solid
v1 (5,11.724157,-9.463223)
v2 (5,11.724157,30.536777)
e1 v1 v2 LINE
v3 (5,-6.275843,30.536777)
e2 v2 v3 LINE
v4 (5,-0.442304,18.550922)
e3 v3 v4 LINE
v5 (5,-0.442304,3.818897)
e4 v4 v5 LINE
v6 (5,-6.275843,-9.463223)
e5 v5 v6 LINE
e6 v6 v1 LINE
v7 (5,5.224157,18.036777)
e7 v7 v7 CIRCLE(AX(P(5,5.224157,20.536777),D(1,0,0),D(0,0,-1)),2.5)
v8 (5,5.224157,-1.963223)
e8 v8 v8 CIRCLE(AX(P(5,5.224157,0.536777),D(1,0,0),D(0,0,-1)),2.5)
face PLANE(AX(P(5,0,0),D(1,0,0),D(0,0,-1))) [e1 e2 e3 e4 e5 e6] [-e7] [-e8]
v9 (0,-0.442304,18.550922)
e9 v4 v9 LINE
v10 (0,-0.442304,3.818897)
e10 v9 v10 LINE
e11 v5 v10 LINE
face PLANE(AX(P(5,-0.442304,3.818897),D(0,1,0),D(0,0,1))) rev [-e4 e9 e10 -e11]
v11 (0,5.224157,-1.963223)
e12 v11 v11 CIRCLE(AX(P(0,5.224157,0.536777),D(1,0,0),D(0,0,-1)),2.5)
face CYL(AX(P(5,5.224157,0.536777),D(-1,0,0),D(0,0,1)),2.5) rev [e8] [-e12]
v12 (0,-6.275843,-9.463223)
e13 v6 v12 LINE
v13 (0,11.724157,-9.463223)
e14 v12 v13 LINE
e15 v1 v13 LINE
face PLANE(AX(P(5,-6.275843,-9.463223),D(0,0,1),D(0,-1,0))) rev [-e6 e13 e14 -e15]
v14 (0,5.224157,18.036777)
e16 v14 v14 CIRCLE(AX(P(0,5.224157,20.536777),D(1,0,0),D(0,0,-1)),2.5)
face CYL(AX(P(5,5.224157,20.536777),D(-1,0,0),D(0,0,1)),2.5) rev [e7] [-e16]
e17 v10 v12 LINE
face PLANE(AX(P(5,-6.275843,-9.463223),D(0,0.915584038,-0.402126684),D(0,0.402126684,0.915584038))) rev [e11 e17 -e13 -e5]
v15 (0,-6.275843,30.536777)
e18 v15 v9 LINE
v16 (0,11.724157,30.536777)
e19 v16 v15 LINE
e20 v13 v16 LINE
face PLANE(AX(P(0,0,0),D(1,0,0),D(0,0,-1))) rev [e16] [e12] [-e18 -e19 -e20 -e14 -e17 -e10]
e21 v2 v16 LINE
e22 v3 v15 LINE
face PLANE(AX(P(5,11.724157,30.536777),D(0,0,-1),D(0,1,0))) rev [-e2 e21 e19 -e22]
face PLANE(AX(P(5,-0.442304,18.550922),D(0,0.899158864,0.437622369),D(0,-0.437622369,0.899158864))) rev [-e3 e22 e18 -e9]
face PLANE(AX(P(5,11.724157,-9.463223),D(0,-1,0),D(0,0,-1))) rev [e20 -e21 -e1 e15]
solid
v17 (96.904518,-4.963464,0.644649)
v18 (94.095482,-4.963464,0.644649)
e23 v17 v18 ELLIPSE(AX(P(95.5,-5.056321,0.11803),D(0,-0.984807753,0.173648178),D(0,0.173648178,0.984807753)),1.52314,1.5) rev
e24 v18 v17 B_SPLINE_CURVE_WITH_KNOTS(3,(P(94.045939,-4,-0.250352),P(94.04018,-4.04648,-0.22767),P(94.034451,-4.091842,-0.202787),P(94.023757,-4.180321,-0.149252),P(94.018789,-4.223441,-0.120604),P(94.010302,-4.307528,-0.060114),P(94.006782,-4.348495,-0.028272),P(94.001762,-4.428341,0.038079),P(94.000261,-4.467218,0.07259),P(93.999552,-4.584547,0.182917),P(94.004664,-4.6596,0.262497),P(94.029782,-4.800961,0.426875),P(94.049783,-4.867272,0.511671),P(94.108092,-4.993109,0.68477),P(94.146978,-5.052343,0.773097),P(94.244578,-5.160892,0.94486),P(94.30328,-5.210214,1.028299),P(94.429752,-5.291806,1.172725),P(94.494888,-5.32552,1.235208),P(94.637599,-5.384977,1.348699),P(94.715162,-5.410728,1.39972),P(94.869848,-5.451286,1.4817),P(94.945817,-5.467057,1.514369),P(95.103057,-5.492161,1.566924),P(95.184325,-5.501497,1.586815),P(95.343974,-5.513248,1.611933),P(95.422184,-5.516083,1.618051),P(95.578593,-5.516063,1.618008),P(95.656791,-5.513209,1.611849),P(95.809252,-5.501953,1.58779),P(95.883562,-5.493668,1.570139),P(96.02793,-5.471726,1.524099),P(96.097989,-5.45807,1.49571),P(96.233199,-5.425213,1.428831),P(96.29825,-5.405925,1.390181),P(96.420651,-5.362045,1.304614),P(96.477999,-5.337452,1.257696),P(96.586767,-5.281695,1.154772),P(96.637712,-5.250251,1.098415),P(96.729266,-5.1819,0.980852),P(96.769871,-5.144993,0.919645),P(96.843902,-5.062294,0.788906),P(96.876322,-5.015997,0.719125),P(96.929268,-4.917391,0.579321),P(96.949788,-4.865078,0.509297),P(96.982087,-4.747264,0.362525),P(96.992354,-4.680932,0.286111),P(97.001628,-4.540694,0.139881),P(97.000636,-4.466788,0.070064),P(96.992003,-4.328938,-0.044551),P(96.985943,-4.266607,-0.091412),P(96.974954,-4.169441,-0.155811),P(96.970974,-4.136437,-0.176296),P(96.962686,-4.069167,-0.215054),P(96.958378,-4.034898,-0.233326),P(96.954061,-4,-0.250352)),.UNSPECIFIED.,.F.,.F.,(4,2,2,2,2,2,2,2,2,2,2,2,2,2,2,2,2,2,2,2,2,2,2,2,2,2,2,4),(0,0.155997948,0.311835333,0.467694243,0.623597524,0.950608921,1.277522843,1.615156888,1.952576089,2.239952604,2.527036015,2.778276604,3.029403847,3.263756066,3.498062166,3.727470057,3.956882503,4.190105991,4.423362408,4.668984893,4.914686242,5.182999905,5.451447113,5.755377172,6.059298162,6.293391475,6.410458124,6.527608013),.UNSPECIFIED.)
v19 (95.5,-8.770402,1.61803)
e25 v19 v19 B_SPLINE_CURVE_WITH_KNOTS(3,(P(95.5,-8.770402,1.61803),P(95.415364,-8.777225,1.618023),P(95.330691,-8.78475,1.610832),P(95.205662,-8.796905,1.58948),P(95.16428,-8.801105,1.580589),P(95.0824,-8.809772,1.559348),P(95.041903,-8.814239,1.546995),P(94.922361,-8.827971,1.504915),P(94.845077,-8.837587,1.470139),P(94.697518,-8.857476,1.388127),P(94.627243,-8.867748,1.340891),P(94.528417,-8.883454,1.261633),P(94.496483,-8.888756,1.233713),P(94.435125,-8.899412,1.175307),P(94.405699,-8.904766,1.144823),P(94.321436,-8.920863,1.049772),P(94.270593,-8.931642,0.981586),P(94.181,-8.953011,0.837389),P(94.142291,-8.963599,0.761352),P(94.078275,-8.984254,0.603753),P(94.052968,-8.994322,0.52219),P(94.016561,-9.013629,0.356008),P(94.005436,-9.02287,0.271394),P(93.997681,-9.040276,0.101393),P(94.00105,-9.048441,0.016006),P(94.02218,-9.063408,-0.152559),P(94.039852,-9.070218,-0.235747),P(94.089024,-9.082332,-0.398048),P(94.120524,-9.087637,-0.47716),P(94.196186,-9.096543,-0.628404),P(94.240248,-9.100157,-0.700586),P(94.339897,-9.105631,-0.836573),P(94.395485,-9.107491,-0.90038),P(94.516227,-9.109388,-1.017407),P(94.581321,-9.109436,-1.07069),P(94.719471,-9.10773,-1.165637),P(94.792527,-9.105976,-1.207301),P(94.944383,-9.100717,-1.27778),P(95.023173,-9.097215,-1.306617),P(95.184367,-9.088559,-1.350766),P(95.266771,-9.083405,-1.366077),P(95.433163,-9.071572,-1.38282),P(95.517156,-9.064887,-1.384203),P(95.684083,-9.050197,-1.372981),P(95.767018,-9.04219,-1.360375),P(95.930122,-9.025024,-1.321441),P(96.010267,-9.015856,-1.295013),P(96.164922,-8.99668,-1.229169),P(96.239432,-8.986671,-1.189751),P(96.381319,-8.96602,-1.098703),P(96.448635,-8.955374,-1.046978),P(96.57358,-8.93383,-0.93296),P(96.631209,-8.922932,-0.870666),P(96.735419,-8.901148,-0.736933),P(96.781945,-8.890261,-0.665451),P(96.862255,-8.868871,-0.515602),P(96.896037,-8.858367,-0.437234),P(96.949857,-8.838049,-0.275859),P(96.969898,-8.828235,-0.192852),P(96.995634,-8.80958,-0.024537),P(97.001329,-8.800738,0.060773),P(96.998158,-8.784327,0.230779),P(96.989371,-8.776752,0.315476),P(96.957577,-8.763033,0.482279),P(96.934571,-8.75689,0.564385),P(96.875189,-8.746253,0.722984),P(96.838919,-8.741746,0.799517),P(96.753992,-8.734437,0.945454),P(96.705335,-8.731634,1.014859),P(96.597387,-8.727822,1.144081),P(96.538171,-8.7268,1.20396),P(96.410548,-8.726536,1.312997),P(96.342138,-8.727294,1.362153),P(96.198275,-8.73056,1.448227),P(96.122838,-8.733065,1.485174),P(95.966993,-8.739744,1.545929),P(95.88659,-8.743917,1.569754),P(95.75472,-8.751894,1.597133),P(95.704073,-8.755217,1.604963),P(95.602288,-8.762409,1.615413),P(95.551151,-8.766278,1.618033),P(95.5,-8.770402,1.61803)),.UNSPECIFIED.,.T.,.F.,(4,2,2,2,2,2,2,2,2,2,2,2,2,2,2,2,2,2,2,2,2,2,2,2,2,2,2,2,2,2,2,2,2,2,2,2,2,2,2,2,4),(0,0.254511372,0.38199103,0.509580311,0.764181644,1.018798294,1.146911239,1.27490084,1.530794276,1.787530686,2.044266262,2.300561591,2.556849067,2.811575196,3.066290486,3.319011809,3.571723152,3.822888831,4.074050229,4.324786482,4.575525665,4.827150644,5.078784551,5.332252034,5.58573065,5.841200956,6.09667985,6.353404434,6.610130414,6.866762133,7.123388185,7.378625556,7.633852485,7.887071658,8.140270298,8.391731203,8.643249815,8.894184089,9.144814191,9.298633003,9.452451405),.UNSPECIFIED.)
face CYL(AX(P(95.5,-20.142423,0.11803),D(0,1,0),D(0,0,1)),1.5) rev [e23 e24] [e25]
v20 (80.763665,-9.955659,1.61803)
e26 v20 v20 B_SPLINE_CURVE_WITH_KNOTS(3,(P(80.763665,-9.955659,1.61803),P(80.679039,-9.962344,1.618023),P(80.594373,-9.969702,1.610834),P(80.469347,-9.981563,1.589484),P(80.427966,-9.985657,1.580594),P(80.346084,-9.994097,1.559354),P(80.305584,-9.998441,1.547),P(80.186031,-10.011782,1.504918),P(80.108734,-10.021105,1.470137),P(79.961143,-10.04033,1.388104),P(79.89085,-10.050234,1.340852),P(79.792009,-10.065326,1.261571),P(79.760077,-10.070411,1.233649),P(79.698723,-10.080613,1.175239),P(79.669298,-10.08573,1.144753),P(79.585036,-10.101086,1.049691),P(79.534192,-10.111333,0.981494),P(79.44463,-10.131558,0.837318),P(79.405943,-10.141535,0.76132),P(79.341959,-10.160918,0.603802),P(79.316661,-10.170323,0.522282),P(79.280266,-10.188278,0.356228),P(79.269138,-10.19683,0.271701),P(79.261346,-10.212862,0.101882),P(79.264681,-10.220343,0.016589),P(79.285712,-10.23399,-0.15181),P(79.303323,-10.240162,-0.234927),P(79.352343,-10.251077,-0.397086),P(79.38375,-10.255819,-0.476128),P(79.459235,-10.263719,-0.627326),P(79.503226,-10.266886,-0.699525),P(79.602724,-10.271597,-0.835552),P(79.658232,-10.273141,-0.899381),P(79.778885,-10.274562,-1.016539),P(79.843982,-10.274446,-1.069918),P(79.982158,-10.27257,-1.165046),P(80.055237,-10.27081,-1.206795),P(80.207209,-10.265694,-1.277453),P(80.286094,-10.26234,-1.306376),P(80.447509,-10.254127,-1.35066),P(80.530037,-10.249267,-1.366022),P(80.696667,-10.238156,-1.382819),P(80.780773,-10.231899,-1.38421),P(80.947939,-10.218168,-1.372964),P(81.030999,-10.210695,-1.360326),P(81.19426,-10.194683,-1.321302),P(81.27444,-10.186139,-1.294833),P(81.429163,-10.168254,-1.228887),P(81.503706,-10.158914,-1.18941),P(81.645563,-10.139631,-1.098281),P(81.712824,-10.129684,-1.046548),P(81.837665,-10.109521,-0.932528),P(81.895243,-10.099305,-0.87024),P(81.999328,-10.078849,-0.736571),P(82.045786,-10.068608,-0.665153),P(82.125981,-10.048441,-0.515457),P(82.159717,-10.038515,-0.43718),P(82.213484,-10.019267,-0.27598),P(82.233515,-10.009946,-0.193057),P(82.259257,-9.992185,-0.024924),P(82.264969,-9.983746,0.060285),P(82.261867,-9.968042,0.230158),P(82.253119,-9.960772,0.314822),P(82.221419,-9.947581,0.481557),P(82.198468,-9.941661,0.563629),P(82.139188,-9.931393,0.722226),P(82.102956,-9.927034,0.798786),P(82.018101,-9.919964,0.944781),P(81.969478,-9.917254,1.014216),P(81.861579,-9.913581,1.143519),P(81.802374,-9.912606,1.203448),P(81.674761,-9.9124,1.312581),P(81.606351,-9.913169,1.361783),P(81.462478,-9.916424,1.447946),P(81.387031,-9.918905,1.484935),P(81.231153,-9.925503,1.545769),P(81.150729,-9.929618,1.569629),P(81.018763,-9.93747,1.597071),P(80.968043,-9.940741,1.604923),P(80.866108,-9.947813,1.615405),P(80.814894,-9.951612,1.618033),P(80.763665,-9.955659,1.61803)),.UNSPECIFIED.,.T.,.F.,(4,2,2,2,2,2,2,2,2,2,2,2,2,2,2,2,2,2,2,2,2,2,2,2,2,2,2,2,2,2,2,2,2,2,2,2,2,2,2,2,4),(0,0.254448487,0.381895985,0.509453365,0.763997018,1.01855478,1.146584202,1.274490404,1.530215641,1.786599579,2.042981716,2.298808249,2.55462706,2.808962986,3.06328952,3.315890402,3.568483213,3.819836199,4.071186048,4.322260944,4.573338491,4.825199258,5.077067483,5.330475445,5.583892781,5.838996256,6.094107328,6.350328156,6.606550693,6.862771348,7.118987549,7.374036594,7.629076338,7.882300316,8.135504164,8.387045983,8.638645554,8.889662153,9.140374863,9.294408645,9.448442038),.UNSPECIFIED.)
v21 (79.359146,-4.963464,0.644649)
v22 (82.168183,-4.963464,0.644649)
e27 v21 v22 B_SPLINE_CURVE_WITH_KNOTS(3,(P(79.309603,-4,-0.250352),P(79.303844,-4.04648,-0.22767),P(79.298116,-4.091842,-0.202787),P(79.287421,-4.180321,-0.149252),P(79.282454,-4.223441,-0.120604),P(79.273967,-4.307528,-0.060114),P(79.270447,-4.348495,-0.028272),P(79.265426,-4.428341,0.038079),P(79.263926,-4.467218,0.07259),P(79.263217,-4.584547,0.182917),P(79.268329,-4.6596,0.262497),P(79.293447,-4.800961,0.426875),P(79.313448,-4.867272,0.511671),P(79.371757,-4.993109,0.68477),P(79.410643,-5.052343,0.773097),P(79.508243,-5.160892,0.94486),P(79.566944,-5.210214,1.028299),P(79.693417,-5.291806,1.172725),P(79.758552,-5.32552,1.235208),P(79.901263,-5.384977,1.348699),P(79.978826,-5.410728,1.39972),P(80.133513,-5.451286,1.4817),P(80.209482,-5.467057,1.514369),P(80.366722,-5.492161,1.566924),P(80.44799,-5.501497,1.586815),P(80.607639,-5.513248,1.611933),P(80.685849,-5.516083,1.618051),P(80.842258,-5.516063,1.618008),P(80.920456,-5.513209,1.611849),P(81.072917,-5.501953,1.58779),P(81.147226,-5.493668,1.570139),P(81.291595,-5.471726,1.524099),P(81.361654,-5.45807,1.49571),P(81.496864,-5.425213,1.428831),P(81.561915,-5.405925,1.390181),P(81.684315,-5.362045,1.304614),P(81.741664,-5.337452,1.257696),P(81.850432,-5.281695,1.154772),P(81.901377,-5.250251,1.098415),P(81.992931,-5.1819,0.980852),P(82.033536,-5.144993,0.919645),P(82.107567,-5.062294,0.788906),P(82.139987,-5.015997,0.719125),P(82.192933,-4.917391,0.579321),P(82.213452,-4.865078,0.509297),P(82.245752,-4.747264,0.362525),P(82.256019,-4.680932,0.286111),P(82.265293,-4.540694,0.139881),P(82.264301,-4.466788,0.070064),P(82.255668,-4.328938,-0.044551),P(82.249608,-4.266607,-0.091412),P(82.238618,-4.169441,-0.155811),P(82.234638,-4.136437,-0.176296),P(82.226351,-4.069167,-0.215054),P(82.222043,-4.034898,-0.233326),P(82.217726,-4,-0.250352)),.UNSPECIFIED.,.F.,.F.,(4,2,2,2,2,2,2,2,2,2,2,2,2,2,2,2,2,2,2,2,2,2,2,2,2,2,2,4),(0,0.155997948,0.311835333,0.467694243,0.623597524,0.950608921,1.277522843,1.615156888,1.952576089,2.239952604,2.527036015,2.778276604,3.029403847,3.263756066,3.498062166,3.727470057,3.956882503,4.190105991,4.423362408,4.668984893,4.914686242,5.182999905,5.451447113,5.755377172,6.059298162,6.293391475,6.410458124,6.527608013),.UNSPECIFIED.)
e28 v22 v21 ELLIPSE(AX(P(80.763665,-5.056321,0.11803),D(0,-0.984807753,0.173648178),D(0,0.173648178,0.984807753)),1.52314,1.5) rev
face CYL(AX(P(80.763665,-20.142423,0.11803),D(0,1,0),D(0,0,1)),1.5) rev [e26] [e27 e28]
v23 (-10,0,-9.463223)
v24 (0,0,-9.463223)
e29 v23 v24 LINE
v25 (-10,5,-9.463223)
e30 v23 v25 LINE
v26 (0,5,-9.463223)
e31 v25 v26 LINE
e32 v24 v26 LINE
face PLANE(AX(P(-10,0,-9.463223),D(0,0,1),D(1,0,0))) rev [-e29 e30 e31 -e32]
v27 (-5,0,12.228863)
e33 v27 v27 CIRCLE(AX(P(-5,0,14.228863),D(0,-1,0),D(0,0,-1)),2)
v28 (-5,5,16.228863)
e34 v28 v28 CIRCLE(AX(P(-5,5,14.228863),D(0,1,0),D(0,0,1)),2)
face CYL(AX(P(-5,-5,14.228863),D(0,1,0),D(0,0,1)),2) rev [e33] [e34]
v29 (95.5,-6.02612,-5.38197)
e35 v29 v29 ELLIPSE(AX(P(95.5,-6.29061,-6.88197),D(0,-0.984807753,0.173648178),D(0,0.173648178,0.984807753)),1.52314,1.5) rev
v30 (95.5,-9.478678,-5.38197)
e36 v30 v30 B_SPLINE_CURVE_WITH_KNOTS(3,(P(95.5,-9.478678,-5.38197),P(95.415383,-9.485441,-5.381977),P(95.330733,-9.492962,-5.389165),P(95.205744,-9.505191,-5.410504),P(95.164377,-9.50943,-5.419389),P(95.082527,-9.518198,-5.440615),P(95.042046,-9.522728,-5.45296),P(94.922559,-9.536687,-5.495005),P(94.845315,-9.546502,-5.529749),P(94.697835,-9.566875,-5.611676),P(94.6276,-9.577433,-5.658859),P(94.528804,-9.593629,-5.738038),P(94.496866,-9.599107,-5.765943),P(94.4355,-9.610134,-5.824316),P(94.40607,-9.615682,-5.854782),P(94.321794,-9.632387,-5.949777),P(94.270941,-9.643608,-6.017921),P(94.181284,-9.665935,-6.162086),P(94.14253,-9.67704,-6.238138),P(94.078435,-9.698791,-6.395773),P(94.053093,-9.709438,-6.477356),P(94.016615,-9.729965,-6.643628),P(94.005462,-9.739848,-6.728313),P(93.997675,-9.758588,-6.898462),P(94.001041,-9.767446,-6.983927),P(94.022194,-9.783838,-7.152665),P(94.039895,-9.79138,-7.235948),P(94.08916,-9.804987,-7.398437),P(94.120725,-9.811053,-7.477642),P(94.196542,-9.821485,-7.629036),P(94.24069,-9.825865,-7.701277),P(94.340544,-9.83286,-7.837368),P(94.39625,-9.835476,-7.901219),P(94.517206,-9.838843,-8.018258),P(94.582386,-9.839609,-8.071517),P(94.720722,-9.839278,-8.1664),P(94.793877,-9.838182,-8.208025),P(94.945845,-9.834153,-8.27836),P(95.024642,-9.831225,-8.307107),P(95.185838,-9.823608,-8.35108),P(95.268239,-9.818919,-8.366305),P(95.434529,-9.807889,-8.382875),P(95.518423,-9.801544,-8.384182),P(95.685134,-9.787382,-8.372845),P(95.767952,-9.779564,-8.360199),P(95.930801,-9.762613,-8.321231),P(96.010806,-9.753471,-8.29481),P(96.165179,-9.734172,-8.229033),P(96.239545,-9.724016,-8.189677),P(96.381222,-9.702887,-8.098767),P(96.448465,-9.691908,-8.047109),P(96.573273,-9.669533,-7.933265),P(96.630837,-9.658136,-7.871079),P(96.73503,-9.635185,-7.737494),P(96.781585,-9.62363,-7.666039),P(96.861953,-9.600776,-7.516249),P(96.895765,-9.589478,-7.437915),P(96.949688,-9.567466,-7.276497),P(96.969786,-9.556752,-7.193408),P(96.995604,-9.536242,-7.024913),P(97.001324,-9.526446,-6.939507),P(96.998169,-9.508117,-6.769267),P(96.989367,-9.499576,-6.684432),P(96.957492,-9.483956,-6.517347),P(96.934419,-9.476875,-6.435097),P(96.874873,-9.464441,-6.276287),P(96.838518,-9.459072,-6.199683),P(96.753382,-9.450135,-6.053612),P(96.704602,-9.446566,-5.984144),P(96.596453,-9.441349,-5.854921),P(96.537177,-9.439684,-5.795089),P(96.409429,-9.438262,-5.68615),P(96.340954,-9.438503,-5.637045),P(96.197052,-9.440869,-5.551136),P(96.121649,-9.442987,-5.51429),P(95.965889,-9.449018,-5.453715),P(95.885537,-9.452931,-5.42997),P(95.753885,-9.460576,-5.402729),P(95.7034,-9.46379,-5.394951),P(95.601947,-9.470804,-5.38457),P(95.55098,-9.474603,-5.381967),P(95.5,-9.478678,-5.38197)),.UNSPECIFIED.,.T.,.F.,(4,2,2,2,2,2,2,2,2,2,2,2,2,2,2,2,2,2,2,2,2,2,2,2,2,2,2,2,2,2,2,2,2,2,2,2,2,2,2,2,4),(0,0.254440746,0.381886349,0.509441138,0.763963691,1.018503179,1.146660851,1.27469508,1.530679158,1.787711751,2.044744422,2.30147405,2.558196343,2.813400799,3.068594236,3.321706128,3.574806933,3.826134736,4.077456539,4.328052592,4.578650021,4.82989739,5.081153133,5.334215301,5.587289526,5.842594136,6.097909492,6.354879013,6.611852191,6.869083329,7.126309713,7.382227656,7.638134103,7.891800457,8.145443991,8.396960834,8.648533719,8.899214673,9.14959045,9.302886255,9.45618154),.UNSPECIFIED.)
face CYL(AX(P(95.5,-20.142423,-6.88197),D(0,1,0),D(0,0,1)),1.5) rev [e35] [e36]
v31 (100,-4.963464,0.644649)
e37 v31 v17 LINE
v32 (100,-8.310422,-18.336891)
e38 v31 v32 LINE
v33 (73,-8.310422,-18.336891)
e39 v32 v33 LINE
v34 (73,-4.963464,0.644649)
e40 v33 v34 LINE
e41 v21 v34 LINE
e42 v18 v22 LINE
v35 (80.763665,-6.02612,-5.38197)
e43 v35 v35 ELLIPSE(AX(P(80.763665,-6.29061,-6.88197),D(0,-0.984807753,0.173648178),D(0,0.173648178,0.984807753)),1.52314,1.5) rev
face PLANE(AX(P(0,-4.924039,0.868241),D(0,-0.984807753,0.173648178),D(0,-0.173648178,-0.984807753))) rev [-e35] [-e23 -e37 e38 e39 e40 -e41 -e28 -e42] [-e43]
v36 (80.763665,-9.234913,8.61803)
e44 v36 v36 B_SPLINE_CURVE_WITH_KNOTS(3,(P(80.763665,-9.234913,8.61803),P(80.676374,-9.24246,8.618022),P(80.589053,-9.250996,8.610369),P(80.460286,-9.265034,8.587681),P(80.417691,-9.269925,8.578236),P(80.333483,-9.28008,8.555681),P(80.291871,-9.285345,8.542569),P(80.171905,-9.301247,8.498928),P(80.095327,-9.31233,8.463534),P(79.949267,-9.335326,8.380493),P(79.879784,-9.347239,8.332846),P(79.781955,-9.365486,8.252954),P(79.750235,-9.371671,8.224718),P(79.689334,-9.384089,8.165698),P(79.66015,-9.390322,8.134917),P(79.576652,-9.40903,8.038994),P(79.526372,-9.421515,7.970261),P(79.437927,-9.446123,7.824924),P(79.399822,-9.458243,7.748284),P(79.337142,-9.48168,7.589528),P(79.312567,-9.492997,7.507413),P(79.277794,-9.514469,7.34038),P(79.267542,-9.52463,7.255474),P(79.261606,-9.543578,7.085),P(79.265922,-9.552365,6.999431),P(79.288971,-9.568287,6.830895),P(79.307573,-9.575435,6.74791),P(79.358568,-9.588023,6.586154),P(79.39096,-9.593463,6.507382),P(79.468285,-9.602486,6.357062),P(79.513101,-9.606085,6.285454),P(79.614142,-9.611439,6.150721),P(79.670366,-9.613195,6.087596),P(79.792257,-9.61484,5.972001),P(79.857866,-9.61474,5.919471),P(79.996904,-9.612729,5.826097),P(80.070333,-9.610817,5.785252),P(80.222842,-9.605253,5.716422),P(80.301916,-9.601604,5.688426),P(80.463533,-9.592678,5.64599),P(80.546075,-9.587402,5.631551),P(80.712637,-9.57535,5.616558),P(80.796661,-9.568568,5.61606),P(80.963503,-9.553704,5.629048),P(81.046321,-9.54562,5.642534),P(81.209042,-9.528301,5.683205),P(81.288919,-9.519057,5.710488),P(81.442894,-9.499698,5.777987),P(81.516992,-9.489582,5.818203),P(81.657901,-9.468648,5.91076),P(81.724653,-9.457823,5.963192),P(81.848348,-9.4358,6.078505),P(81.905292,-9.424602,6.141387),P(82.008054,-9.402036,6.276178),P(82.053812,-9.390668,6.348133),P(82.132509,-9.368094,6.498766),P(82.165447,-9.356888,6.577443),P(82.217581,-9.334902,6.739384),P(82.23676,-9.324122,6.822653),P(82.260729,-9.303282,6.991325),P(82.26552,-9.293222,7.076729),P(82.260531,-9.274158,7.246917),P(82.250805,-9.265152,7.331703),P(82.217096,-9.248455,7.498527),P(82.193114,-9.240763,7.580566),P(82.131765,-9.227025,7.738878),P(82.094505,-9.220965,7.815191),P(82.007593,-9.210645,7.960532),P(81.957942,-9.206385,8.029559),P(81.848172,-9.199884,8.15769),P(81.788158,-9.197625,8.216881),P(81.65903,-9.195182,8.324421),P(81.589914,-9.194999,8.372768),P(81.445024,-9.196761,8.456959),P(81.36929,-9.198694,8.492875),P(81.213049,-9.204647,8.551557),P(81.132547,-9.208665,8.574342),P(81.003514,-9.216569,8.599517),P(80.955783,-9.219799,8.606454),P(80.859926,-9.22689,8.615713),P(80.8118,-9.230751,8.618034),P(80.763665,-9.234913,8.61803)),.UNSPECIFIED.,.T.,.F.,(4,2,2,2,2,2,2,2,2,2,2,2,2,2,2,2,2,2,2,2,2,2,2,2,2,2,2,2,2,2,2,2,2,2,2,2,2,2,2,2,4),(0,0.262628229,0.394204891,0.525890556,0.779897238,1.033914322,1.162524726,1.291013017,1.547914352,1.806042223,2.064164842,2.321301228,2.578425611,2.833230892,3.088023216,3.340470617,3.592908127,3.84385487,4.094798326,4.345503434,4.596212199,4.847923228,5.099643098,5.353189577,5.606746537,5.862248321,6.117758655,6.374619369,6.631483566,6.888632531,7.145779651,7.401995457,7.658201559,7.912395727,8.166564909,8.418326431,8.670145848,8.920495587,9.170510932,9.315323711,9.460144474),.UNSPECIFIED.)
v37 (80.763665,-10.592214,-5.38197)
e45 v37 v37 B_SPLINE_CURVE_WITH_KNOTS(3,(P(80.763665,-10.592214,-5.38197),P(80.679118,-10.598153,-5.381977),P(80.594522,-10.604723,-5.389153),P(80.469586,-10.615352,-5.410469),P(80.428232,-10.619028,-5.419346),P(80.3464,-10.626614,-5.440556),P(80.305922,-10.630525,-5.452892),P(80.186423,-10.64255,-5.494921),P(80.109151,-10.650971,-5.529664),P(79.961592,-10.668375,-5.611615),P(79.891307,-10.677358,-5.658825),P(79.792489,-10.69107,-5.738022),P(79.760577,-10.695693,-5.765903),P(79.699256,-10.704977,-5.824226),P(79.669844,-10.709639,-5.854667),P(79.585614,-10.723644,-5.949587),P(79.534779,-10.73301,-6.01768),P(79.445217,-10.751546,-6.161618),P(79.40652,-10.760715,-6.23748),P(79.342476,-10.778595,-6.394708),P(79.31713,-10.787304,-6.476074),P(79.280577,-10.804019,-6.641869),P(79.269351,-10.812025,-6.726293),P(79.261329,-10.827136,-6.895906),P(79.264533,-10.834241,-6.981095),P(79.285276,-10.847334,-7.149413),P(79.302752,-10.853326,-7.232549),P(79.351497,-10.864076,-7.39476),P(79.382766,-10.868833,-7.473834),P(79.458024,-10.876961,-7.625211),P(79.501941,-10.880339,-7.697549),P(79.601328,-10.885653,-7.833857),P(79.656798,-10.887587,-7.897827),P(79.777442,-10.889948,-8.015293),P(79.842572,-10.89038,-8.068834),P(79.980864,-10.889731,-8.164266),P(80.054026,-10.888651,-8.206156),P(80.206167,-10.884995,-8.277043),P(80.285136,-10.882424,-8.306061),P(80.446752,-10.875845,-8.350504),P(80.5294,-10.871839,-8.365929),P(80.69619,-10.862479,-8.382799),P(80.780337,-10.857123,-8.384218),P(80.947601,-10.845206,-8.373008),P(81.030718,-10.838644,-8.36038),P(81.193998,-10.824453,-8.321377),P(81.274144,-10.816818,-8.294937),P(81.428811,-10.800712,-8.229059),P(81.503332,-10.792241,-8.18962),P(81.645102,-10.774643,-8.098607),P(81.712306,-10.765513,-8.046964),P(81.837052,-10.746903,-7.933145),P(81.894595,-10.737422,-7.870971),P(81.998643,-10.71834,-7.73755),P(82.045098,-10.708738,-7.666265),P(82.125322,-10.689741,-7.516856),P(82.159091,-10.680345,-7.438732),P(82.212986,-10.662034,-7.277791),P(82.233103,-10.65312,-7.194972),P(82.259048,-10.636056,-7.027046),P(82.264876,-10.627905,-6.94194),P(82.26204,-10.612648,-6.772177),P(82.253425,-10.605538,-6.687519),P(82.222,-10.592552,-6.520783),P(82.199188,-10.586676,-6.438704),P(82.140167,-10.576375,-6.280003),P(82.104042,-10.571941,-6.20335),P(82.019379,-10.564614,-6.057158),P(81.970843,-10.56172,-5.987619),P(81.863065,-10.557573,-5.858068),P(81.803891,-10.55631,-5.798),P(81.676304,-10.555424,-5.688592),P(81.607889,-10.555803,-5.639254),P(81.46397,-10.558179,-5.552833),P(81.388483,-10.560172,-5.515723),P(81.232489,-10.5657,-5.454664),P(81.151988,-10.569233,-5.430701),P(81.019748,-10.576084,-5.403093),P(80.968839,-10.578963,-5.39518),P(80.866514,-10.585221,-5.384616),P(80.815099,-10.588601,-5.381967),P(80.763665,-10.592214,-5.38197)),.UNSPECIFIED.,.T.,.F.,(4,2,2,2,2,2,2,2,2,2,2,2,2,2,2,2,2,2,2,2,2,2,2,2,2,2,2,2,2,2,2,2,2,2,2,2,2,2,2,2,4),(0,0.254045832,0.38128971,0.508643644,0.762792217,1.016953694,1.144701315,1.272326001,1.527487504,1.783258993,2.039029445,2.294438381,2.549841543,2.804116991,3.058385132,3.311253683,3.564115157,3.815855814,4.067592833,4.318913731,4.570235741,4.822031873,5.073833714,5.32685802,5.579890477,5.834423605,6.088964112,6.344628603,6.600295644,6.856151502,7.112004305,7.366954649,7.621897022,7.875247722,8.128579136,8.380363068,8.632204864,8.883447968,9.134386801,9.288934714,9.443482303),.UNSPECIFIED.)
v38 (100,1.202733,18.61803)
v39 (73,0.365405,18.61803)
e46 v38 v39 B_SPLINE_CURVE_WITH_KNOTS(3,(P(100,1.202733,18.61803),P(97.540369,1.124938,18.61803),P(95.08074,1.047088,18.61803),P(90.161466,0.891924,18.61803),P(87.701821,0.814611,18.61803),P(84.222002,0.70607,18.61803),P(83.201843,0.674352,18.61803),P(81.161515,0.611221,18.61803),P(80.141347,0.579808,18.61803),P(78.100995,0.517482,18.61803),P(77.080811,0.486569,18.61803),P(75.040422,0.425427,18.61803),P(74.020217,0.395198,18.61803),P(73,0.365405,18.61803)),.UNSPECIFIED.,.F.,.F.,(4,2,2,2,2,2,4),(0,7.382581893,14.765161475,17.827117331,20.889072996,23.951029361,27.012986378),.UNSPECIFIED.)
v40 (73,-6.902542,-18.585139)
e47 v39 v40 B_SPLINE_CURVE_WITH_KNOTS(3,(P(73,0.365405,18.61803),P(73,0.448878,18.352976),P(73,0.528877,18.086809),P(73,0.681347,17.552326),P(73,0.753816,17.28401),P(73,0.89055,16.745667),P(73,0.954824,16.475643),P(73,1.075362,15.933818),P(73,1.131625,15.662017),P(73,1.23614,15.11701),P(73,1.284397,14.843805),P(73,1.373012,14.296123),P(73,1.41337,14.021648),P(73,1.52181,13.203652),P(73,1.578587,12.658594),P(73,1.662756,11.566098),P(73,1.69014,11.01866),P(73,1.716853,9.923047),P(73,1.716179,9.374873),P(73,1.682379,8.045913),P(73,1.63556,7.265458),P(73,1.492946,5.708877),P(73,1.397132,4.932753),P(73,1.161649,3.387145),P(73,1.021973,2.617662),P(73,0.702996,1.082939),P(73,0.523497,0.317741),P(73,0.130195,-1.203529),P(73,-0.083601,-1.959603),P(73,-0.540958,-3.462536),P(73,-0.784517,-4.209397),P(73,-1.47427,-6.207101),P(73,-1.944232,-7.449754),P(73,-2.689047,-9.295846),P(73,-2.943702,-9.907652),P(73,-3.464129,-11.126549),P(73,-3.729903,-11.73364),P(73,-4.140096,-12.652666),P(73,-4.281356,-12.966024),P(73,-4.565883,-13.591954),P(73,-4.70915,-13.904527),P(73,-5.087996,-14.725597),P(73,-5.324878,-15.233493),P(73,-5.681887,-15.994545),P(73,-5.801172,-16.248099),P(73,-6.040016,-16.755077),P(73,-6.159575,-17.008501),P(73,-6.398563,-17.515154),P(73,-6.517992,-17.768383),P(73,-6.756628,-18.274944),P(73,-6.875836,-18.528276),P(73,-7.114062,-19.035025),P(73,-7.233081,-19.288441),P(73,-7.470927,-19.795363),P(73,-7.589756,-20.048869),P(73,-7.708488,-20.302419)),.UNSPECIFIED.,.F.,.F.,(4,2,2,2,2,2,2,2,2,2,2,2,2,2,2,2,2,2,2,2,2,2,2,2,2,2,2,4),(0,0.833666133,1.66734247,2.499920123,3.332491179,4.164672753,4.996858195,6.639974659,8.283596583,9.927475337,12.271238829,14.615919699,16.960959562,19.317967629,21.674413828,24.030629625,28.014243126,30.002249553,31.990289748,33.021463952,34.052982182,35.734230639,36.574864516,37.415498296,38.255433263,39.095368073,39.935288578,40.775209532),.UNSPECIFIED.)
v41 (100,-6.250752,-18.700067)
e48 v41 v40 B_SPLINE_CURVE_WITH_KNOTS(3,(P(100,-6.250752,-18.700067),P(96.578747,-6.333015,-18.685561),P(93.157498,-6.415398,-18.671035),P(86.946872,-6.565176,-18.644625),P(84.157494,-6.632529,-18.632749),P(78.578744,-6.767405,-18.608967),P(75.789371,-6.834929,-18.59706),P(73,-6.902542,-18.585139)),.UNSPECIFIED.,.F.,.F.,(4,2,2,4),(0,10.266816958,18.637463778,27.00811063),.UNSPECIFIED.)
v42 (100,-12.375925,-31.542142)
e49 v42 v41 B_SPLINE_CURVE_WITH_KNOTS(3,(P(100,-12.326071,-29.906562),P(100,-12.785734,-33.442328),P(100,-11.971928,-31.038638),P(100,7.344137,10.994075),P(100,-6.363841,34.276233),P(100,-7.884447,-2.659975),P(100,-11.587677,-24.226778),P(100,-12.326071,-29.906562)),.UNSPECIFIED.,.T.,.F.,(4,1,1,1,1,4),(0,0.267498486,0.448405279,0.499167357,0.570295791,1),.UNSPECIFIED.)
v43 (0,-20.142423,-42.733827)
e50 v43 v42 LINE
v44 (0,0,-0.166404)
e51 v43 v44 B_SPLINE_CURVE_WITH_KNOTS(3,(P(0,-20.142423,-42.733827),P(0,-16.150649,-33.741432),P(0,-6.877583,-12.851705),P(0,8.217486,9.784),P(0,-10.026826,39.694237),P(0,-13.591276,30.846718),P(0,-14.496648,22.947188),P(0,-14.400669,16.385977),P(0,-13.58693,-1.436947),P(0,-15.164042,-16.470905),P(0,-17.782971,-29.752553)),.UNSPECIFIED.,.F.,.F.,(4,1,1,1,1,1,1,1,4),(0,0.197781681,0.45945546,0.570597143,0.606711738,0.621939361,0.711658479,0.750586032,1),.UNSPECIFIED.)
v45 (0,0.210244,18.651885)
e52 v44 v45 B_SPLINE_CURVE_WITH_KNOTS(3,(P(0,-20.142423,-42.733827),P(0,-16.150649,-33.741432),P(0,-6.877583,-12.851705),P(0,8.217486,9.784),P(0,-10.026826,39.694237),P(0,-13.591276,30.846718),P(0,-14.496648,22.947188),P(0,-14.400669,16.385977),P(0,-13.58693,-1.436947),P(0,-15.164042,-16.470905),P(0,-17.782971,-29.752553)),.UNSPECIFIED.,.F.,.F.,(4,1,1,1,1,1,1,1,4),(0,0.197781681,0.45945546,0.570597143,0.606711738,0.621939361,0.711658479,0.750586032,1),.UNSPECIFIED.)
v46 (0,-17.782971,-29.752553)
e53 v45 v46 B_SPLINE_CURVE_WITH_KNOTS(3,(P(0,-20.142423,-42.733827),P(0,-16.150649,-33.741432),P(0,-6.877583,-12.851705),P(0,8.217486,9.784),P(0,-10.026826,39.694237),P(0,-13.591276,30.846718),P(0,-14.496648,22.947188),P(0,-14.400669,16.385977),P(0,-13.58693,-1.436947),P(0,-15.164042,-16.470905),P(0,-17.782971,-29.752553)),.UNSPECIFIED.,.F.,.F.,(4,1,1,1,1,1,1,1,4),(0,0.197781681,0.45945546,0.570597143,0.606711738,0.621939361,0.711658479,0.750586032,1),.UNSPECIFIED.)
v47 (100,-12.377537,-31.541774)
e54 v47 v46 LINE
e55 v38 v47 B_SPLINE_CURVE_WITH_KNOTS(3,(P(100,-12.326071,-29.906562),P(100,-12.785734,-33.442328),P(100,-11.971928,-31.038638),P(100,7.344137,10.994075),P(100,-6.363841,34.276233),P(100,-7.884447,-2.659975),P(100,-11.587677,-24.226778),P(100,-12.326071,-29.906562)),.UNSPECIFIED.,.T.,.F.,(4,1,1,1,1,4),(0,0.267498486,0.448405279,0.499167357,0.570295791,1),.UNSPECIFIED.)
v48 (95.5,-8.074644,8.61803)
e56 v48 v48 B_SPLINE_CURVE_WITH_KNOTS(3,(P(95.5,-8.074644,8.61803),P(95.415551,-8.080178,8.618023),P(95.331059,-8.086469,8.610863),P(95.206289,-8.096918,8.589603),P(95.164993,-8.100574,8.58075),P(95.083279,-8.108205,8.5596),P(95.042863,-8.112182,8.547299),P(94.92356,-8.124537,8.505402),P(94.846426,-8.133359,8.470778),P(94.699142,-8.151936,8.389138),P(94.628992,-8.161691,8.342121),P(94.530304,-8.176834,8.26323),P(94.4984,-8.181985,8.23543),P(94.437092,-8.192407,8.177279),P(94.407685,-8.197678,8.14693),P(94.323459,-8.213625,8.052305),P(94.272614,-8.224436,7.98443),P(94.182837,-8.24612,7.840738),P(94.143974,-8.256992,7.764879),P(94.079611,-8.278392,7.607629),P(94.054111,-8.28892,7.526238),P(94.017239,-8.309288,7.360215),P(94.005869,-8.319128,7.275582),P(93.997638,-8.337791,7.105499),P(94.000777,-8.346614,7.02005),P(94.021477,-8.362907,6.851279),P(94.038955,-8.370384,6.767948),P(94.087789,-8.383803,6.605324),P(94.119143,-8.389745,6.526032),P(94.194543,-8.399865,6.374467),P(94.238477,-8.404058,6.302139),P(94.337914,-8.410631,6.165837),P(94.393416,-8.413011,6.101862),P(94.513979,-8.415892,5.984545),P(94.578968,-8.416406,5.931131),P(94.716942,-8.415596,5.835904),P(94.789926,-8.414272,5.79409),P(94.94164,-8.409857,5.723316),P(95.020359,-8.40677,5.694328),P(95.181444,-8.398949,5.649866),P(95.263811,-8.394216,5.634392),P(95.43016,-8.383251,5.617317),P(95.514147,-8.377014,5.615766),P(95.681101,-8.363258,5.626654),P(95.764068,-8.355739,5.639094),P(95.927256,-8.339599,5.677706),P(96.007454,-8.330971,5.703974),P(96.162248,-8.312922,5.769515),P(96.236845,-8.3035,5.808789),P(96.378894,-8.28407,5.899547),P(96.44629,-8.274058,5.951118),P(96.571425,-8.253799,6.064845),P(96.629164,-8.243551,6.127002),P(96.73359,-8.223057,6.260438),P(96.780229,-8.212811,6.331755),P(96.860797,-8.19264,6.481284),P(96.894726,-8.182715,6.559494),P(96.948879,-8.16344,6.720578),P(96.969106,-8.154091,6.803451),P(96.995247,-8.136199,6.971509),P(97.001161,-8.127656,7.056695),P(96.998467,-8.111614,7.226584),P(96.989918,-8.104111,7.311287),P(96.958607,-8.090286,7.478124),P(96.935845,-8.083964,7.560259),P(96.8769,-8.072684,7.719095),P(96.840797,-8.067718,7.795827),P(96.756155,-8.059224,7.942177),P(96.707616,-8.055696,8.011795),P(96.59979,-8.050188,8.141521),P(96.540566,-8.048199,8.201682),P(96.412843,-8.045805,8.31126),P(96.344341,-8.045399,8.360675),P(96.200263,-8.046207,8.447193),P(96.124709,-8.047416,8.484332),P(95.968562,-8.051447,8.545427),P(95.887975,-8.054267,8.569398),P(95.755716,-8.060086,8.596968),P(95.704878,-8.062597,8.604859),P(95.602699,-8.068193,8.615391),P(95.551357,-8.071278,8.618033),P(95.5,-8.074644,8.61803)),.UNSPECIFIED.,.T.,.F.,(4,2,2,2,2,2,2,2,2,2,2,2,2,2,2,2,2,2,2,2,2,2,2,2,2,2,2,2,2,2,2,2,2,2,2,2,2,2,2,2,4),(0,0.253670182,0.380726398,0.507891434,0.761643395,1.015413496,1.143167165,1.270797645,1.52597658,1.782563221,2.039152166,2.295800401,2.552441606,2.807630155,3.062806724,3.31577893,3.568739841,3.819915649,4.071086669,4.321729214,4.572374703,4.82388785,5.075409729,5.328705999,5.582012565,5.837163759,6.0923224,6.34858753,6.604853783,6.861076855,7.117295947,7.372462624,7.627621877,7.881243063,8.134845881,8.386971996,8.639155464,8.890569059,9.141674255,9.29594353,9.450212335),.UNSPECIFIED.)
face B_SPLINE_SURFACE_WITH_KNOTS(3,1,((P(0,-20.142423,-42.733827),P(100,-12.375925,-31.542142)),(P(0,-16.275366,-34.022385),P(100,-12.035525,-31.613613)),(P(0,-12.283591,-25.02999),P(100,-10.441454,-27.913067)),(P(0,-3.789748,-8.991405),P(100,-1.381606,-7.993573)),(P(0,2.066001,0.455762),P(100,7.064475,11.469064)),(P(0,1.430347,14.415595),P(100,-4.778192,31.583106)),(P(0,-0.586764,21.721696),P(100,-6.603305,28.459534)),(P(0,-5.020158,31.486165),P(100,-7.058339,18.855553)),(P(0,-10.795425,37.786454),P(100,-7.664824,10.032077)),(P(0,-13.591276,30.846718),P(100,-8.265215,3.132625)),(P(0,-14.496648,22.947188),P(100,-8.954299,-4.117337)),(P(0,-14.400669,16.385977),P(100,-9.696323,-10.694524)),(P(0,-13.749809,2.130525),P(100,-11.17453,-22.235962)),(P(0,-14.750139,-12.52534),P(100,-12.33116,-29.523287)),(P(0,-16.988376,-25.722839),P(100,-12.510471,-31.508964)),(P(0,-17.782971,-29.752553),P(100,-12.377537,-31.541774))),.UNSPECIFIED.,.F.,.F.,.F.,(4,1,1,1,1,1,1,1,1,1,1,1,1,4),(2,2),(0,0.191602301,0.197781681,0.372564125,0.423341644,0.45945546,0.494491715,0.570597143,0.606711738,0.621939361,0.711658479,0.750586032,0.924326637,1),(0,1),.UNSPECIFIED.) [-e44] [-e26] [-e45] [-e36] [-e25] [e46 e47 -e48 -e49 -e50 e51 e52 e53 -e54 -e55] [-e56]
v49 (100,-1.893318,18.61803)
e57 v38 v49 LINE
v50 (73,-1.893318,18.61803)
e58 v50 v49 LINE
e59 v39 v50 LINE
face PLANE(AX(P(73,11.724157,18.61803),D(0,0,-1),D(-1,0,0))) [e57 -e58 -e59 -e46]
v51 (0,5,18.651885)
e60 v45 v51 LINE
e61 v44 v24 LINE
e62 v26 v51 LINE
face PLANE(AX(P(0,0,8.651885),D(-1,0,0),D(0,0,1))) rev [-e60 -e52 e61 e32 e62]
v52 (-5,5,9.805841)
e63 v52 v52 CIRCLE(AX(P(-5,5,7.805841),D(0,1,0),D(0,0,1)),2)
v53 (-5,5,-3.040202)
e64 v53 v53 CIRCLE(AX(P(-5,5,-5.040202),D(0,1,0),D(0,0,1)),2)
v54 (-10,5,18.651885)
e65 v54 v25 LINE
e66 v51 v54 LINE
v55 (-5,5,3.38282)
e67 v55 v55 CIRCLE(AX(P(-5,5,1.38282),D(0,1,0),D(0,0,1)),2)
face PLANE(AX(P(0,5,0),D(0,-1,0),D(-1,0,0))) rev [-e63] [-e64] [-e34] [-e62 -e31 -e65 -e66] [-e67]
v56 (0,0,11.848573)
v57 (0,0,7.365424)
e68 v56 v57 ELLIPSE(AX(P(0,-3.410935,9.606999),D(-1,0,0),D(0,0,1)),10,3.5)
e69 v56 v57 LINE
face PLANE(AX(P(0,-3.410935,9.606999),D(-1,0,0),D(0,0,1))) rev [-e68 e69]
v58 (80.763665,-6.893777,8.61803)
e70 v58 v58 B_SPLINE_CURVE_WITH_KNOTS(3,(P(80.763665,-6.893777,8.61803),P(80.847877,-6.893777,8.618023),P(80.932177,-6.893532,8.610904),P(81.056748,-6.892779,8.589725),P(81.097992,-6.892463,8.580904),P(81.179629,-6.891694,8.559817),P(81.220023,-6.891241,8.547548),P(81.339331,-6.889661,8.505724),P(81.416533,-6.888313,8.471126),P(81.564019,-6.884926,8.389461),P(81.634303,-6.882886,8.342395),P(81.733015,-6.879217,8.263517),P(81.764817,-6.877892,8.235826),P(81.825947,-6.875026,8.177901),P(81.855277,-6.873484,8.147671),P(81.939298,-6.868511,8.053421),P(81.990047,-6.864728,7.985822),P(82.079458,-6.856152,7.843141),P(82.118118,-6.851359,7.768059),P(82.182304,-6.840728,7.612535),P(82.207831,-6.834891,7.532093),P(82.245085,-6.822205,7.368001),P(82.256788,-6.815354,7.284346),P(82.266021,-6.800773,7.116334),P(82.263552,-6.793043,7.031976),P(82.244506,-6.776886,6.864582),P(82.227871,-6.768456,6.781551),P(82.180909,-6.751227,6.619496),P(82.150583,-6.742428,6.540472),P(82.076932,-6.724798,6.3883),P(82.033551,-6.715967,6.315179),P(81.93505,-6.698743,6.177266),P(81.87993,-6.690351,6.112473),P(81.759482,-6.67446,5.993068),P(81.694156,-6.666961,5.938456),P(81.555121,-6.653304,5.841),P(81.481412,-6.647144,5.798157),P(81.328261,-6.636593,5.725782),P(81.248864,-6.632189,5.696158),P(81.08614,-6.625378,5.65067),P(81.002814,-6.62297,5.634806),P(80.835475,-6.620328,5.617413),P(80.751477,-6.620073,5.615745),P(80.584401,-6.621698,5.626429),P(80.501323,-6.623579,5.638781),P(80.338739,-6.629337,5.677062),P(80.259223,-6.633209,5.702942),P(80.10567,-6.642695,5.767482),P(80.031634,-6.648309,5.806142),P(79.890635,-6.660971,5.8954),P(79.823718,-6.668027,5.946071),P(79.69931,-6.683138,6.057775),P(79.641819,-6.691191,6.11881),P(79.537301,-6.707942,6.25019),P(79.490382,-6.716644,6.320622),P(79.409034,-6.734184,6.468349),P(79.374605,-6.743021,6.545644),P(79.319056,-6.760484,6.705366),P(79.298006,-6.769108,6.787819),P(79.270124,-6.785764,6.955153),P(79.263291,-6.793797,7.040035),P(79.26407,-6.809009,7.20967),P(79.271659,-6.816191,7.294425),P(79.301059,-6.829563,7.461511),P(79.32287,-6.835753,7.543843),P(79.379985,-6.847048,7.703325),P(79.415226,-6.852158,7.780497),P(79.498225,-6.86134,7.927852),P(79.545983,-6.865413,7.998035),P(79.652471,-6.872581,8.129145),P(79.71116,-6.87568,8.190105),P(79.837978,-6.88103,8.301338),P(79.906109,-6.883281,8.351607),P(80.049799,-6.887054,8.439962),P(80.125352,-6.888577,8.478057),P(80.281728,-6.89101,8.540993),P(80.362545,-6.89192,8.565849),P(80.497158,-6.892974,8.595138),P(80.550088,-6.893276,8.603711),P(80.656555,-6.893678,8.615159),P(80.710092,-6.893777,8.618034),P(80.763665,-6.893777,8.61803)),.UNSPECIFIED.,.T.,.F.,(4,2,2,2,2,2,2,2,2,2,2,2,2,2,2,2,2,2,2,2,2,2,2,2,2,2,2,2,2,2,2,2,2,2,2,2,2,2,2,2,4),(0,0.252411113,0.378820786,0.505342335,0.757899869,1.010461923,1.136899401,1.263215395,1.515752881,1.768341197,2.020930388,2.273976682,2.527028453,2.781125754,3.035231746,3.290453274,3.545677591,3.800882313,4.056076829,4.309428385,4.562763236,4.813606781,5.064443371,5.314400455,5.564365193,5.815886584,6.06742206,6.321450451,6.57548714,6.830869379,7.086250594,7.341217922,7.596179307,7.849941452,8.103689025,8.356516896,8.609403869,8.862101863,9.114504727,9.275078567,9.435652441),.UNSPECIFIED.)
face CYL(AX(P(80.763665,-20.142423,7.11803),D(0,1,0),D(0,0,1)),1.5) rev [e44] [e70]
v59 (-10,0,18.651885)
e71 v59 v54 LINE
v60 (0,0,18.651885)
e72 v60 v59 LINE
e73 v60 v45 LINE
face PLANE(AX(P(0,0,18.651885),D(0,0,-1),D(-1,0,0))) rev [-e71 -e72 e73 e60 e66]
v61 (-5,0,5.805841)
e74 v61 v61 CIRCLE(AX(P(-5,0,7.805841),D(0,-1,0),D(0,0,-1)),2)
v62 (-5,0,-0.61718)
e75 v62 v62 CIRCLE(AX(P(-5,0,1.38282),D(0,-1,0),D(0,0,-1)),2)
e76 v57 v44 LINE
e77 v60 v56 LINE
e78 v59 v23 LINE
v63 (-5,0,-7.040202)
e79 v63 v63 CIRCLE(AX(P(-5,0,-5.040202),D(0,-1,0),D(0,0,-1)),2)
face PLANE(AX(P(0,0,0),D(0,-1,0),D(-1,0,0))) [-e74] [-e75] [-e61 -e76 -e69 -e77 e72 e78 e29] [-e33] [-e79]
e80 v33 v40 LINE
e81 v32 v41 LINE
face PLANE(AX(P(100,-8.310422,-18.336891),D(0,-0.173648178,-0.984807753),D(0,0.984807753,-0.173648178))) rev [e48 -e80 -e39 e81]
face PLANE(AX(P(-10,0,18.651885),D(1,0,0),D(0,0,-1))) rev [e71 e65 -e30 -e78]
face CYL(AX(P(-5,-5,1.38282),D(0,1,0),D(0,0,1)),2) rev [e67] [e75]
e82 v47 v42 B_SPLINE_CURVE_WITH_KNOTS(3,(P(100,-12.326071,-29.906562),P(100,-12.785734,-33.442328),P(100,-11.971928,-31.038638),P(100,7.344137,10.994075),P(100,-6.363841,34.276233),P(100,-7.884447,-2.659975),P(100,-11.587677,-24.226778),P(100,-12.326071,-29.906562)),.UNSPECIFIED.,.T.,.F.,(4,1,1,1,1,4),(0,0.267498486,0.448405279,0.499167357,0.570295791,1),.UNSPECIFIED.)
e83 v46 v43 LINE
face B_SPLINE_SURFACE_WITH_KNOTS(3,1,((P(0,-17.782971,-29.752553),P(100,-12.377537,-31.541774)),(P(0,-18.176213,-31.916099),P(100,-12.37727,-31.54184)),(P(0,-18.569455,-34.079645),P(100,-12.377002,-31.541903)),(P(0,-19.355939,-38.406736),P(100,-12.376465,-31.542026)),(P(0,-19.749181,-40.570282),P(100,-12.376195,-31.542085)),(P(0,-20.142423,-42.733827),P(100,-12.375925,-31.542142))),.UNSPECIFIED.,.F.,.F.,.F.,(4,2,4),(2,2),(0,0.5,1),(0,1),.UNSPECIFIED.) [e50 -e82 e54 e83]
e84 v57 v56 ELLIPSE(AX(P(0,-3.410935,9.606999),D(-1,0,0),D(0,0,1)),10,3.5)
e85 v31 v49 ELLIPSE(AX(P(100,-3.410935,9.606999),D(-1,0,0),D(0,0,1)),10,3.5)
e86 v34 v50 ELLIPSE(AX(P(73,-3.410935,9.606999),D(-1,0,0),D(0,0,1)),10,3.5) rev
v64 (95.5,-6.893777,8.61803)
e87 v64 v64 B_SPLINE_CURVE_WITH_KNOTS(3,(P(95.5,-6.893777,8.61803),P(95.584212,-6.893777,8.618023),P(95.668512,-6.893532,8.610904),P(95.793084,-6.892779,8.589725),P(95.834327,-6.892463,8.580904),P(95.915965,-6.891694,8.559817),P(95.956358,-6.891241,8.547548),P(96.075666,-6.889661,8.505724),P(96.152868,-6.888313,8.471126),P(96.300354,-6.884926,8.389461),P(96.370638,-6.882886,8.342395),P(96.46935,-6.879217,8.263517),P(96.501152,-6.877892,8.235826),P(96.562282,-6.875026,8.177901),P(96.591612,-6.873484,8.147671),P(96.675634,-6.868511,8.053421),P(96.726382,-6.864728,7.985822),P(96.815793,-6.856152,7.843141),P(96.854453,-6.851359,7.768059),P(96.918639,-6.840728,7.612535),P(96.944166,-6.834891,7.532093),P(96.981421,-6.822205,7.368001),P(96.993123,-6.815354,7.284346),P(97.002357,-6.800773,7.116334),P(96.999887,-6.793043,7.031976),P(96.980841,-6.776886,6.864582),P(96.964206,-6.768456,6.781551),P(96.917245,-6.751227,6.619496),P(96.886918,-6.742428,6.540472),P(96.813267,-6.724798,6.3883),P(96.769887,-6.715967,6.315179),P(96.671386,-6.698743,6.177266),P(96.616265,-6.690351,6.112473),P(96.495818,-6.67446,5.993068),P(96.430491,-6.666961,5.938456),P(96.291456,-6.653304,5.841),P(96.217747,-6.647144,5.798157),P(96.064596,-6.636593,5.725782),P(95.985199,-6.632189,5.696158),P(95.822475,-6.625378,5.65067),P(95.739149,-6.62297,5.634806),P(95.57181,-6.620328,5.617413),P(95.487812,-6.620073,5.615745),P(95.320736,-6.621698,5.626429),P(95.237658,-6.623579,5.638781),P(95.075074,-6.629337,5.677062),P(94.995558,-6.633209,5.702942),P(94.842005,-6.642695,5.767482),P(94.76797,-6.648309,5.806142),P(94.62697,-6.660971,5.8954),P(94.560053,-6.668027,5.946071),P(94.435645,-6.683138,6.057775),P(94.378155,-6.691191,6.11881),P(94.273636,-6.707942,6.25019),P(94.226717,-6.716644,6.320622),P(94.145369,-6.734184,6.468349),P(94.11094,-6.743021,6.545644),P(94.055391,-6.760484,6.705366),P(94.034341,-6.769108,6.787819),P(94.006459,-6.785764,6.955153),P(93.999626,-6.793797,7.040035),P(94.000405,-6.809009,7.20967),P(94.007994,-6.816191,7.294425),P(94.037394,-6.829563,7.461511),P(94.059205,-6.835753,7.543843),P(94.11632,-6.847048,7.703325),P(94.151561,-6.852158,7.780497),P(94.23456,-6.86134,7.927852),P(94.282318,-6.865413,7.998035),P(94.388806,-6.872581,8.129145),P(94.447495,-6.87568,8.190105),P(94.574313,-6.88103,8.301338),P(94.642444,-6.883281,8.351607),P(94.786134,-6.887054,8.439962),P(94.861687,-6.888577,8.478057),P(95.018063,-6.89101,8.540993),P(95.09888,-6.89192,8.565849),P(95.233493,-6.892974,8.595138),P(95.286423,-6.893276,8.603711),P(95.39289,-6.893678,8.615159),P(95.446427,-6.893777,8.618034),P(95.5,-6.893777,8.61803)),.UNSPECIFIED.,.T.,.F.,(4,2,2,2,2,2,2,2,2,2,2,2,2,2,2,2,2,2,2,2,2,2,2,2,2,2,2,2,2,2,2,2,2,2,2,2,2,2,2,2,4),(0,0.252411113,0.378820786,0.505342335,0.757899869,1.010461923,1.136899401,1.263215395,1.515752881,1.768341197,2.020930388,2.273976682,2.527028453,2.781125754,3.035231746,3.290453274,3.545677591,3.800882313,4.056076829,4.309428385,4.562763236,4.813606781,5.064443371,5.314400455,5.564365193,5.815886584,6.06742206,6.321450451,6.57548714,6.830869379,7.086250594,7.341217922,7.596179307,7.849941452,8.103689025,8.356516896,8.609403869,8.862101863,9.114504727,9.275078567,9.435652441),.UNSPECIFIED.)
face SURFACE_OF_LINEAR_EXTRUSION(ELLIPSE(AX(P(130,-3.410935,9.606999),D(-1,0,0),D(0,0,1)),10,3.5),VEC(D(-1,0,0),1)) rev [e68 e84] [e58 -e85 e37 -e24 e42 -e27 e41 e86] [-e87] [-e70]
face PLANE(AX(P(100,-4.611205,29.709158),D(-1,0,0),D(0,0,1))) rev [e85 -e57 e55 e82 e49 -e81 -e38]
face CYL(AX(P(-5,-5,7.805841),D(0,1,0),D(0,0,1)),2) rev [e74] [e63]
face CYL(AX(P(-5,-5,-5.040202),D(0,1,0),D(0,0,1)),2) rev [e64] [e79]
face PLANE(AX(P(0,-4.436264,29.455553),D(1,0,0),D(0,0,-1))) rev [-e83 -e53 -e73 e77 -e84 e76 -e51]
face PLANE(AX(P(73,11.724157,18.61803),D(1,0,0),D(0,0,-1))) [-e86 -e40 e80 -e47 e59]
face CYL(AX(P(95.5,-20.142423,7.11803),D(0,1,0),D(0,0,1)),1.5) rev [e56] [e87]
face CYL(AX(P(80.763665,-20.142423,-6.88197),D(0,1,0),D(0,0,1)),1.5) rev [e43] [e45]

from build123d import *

# Parameters (mm, degrees)
SKIZZE5_R                            = 2.5
AUFSATZ_LINEAR_AUSTRAGEN1_DEPTH      = 5
LINEAR_AUSTRAGEN_D_NN1_START         = -5
LINEAR_AUSTRAGEN_D_NN1_OUTLINE_W     = 10
LINEAR_AUSTRAGEN_D_NN1_OUTLINE_H     = 28.115108073
LINEAR_AUSTRAGEN_D_NN1_DEPTH         = 5
SKIZZE11_R                           = 2
SCHNITT_LINEAR_AUSTRAGEN2_DEPTH      = 10
SCHNITT_LINEAR_AUSTRAGEN3_DEPTH      = 112.616851293
SCHNITT_LINEAR_AUSTRAGEN3_DEPTH_BACK = 9
SKIZZE13_W                           = 27
SKIZZE13_H                           = 37
SCHNITT_LINEAR_AUSTRAGEN7_DEPTH      = 110.939792027
SCHNITT_LINEAR_AUSTRAGEN7_DEPTH_BACK = 110.939792027
SKIZZE17_R                           = 1.5
SKIZZE18_RX                          = 10
SKIZZE18_RY                          = 3.5
SCHNITT_LINEAR_AUSTRAGEN8_DEPTH      = 130
SCHNITT_LINEAR_START                 = 10
SKIZZE19_W                           = 27
SKIZZE19_H                           = 37
SCHNITT_LINEAR_AUSTRAGEN9_DEPTH      = 10


with BuildPart() as part:
    # Ausformung2: read off the stored shape, not the designer's step
    # Ausformung2: loft between two sections, ruled curve by curve
    ausformung2_from = [
        Edge.make_bspline([(0, -17.782971384, -29.752553427), (0, -18.176213373, -31.916099097), (0, -18.569455363, -34.079644768), (0, -19.355939343, -38.406736108), (0, -19.749181333, -40.570281779), (0, -20.142423322, -42.733827449)], [0, 0, 0, 0, 0.5, 0.5, 1, 1, 1, 1], 3),
        Edge.make_bspline([(0, -20.142423322, -42.733827449), (0, -16.275365504, -34.022385206), (0, -12.283590924, -25.029989609), (0, -3.789748073, -8.991404596), (0, 2.066001276, 0.455761515), (0, 1.430346702, 14.415595101), (0, -0.586763944, 21.721696295), (0, -5.020157645, 31.4861646), (0, -10.795424952, 37.786454372), (0, -13.591275839, 30.846717822), (0, -14.496647802, 22.947187836), (0, -14.400669009, 16.385976946), (0, -13.749809382, 2.130524692), (0, -14.750138801, -12.525340255), (0, -16.988375852, -25.722839307), (0, -17.782971384, -29.752553427)], [0, 0, 0, 0, 0.191602301, 0.197781681, 0.372564125, 0.423341644, 0.45945546, 0.494491715, 0.570597143, 0.606711738, 0.621939361, 0.711658479, 0.750586032, 0.924326637, 1, 1, 1, 1], 3),
    ]
    ausformung2_to = [
        Edge.make_bspline([(100, -12.377537469, -31.541773649), (100, -12.377270286, -31.541839594), (100, -12.377002346, -31.541903238), (100, -12.37646495, -31.542025921), (100, -12.376195495, -31.542084959), (100, -12.375925281, -31.542141694)], [0, 0, 0, 0, 0.5, 0.5, 1, 1, 1, 1], 3),
        Edge.make_bspline([(100, -12.375925281, -31.542141694), (100, -12.035525318, -31.613612562), (100, -10.441454274, -27.913067425), (100, -1.381605701, -7.993573098), (100, 7.064474888, 11.469064179), (100, -4.778192252, 31.583106174), (100, -6.603305393, 28.459534197), (100, -7.058338771, 18.85555274), (100, -7.66482441, 10.032077024), (100, -8.265214542, 3.132625418), (100, -8.954299419, -4.117336517), (100, -9.69632267, -10.69452384), (100, -11.174529652, -22.235962019), (100, -12.331160065, -29.523287153), (100, -12.51047057, -31.508963631), (100, -12.377537469, -31.541773649)], [0, 0, 0, 0, 0.191602301, 0.197781681, 0.372564125, 0.423341644, 0.45945546, 0.494491715, 0.570597143, 0.606711738, 0.621939361, 0.711658479, 0.750586032, 0.924326637, 1, 1, 1, 1], 3),
    ]
    ausformung2 = Solid(Shell([*[Face.make_surface_from_curves(ausformung2_from[k], ausformung2_to[k]) for k in range(2)], Face(Wire(ausformung2_from)), Face(Wire(ausformung2_to))]))
    add(ausformung2)

    # Linear-Austragen-Dünn1: read off the stored shape, not the designer's step
    # Linear-Austragen-Dünn1 outline → Linear-Austragen-Dünn1 (add)
    with BuildSketch(Plane(origin=(0, 5, 0), x_dir=(1, 0, 0), z_dir=(0, 1, 0)).offset(LINEAR_AUSTRAGEN_D_NN1_START)):
        with Locations((-5, -4.594330562)):
            Rectangle(LINEAR_AUSTRAGEN_D_NN1_OUTLINE_W, LINEAR_AUSTRAGEN_D_NN1_OUTLINE_H)
    extrude(amount=LINEAR_AUSTRAGEN_D_NN1_DEPTH)

    # Skizze11 → Schnitt-Linear austragen2 (cut)
    with BuildSketch(Plane(origin=(0, 5, 0), x_dir=(1, 0, 0), z_dir=(0, 1, 0))):
        with Locations(Location((-5, -14.228862983, 0), (0, 0, 270))):
            Circle(SKIZZE11_R)
        with Locations(Location((-5, 5.040201861, 0), (0, 0, 270))):
            Circle(SKIZZE11_R)
        with Locations(Location((-5, -7.805841369, 0), (0, 0, 270))):
            Circle(SKIZZE11_R)
        with Locations(Location((-5, -1.382819754, 0), (0, 0, 270))):
            Circle(SKIZZE11_R)
    extrude(amount=-SCHNITT_LINEAR_AUSTRAGEN2_DEPTH, mode=Mode.SUBTRACT)

    # Skizze13 → Schnitt-Linear austragen3 (cut, two sides: drawn at the far end of the back side and taken through both)
    with BuildSketch(Plane(origin=(0, 5, 0), x_dir=(1, 0, 0), z_dir=(0, 1, 0)).offset(-SCHNITT_LINEAR_AUSTRAGEN3_DEPTH_BACK)):
        with Locations((86.5, -0.118029586)):
            Rectangle(SKIZZE13_W, SKIZZE13_H)
    extrude(amount=SCHNITT_LINEAR_AUSTRAGEN3_DEPTH + SCHNITT_LINEAR_AUSTRAGEN3_DEPTH_BACK, mode=Mode.SUBTRACT)

    # Skizze17 → Schnitt-Linear austragen7 (cut, two sides: drawn at the far end of the back side and taken through both)
    with BuildSketch(Plane(origin=(0, -4, 0), x_dir=(1, 0, 0), z_dir=(0, 1, 0)).offset(-SCHNITT_LINEAR_AUSTRAGEN7_DEPTH_BACK)):
        with Locations(Location((95.5, -7.118029586, 0), (0, 0, 270))):
            Circle(SKIZZE17_R)
        with Locations(Location((95.5, -0.118029586, 0), (0, 0, 270))):
            Circle(SKIZZE17_R)
        with Locations(Location((95.5, 6.881970414, 0), (0, 0, 270))):
            Circle(SKIZZE17_R)
        with Locations(Location((80.763664796, 6.881970414, 0), (0, 0, 270))):
            Circle(SKIZZE17_R)
        with Locations(Location((80.763664796, -0.118029586, 0), (0, 0, 270))):
            Circle(SKIZZE17_R)
        with Locations(Location((80.763664796, -7.118029586, 0), (0, 0, 270))):
            Circle(SKIZZE17_R)
    extrude(amount=SCHNITT_LINEAR_AUSTRAGEN7_DEPTH + SCHNITT_LINEAR_AUSTRAGEN7_DEPTH_BACK, mode=Mode.SUBTRACT)

    # Skizze18 → Schnitt-Linear austragen8 (cut)
    with BuildSketch(Plane.ZY):
        with Locations((9.606998582, -3.410935315)):
            Ellipse(SKIZZE18_RX, SKIZZE18_RY)
    extrude(amount=-SCHNITT_LINEAR_AUSTRAGEN8_DEPTH, mode=Mode.SUBTRACT)

    # Skizze19 → Schnitt-Linear austragen9 (cut)
    with BuildSketch(Plane(origin=(0, -4.924038765, 0.868240888), x_dir=(1, 0, 0), z_dir=(0, 0.984807753012208, -0.17364817766693072)).offset(SCHNITT_LINEAR_START)):
        with Locations((86.5, 1.001402317)):
            Rectangle(SKIZZE19_W, SKIZZE19_H)
    extrude(amount=-SCHNITT_LINEAR_AUSTRAGEN9_DEPTH, mode=Mode.SUBTRACT)


with BuildPart() as body_2:
    # Skizze5 → Aufsatz-Linear austragen1 (new body)
    with BuildSketch(Plane(origin=(0, 0, 0), x_dir=(0, 0, -1), z_dir=(1, 0, 0))):
        Polygon((9.463223475, -6.275842946), (9.463223475, 11.724157054), (-30.536776525, 11.724157054), (-30.536776525, -6.275842946), (-18.550921932, -0.442304191), (-3.818896749, -0.442304191), align=None)
        with Locations((-0.536776525, 5.224157054)):
            Circle(SKIZZE5_R, mode=Mode.SUBTRACT)
        with Locations((-20.536776525, 5.224157054)):
            Circle(SKIZZE5_R, mode=Mode.SUBTRACT)
    extrude(amount=AUFSATZ_LINEAR_AUSTRAGEN1_DEPTH)


solid = Compound([part.part, body_2.part])
